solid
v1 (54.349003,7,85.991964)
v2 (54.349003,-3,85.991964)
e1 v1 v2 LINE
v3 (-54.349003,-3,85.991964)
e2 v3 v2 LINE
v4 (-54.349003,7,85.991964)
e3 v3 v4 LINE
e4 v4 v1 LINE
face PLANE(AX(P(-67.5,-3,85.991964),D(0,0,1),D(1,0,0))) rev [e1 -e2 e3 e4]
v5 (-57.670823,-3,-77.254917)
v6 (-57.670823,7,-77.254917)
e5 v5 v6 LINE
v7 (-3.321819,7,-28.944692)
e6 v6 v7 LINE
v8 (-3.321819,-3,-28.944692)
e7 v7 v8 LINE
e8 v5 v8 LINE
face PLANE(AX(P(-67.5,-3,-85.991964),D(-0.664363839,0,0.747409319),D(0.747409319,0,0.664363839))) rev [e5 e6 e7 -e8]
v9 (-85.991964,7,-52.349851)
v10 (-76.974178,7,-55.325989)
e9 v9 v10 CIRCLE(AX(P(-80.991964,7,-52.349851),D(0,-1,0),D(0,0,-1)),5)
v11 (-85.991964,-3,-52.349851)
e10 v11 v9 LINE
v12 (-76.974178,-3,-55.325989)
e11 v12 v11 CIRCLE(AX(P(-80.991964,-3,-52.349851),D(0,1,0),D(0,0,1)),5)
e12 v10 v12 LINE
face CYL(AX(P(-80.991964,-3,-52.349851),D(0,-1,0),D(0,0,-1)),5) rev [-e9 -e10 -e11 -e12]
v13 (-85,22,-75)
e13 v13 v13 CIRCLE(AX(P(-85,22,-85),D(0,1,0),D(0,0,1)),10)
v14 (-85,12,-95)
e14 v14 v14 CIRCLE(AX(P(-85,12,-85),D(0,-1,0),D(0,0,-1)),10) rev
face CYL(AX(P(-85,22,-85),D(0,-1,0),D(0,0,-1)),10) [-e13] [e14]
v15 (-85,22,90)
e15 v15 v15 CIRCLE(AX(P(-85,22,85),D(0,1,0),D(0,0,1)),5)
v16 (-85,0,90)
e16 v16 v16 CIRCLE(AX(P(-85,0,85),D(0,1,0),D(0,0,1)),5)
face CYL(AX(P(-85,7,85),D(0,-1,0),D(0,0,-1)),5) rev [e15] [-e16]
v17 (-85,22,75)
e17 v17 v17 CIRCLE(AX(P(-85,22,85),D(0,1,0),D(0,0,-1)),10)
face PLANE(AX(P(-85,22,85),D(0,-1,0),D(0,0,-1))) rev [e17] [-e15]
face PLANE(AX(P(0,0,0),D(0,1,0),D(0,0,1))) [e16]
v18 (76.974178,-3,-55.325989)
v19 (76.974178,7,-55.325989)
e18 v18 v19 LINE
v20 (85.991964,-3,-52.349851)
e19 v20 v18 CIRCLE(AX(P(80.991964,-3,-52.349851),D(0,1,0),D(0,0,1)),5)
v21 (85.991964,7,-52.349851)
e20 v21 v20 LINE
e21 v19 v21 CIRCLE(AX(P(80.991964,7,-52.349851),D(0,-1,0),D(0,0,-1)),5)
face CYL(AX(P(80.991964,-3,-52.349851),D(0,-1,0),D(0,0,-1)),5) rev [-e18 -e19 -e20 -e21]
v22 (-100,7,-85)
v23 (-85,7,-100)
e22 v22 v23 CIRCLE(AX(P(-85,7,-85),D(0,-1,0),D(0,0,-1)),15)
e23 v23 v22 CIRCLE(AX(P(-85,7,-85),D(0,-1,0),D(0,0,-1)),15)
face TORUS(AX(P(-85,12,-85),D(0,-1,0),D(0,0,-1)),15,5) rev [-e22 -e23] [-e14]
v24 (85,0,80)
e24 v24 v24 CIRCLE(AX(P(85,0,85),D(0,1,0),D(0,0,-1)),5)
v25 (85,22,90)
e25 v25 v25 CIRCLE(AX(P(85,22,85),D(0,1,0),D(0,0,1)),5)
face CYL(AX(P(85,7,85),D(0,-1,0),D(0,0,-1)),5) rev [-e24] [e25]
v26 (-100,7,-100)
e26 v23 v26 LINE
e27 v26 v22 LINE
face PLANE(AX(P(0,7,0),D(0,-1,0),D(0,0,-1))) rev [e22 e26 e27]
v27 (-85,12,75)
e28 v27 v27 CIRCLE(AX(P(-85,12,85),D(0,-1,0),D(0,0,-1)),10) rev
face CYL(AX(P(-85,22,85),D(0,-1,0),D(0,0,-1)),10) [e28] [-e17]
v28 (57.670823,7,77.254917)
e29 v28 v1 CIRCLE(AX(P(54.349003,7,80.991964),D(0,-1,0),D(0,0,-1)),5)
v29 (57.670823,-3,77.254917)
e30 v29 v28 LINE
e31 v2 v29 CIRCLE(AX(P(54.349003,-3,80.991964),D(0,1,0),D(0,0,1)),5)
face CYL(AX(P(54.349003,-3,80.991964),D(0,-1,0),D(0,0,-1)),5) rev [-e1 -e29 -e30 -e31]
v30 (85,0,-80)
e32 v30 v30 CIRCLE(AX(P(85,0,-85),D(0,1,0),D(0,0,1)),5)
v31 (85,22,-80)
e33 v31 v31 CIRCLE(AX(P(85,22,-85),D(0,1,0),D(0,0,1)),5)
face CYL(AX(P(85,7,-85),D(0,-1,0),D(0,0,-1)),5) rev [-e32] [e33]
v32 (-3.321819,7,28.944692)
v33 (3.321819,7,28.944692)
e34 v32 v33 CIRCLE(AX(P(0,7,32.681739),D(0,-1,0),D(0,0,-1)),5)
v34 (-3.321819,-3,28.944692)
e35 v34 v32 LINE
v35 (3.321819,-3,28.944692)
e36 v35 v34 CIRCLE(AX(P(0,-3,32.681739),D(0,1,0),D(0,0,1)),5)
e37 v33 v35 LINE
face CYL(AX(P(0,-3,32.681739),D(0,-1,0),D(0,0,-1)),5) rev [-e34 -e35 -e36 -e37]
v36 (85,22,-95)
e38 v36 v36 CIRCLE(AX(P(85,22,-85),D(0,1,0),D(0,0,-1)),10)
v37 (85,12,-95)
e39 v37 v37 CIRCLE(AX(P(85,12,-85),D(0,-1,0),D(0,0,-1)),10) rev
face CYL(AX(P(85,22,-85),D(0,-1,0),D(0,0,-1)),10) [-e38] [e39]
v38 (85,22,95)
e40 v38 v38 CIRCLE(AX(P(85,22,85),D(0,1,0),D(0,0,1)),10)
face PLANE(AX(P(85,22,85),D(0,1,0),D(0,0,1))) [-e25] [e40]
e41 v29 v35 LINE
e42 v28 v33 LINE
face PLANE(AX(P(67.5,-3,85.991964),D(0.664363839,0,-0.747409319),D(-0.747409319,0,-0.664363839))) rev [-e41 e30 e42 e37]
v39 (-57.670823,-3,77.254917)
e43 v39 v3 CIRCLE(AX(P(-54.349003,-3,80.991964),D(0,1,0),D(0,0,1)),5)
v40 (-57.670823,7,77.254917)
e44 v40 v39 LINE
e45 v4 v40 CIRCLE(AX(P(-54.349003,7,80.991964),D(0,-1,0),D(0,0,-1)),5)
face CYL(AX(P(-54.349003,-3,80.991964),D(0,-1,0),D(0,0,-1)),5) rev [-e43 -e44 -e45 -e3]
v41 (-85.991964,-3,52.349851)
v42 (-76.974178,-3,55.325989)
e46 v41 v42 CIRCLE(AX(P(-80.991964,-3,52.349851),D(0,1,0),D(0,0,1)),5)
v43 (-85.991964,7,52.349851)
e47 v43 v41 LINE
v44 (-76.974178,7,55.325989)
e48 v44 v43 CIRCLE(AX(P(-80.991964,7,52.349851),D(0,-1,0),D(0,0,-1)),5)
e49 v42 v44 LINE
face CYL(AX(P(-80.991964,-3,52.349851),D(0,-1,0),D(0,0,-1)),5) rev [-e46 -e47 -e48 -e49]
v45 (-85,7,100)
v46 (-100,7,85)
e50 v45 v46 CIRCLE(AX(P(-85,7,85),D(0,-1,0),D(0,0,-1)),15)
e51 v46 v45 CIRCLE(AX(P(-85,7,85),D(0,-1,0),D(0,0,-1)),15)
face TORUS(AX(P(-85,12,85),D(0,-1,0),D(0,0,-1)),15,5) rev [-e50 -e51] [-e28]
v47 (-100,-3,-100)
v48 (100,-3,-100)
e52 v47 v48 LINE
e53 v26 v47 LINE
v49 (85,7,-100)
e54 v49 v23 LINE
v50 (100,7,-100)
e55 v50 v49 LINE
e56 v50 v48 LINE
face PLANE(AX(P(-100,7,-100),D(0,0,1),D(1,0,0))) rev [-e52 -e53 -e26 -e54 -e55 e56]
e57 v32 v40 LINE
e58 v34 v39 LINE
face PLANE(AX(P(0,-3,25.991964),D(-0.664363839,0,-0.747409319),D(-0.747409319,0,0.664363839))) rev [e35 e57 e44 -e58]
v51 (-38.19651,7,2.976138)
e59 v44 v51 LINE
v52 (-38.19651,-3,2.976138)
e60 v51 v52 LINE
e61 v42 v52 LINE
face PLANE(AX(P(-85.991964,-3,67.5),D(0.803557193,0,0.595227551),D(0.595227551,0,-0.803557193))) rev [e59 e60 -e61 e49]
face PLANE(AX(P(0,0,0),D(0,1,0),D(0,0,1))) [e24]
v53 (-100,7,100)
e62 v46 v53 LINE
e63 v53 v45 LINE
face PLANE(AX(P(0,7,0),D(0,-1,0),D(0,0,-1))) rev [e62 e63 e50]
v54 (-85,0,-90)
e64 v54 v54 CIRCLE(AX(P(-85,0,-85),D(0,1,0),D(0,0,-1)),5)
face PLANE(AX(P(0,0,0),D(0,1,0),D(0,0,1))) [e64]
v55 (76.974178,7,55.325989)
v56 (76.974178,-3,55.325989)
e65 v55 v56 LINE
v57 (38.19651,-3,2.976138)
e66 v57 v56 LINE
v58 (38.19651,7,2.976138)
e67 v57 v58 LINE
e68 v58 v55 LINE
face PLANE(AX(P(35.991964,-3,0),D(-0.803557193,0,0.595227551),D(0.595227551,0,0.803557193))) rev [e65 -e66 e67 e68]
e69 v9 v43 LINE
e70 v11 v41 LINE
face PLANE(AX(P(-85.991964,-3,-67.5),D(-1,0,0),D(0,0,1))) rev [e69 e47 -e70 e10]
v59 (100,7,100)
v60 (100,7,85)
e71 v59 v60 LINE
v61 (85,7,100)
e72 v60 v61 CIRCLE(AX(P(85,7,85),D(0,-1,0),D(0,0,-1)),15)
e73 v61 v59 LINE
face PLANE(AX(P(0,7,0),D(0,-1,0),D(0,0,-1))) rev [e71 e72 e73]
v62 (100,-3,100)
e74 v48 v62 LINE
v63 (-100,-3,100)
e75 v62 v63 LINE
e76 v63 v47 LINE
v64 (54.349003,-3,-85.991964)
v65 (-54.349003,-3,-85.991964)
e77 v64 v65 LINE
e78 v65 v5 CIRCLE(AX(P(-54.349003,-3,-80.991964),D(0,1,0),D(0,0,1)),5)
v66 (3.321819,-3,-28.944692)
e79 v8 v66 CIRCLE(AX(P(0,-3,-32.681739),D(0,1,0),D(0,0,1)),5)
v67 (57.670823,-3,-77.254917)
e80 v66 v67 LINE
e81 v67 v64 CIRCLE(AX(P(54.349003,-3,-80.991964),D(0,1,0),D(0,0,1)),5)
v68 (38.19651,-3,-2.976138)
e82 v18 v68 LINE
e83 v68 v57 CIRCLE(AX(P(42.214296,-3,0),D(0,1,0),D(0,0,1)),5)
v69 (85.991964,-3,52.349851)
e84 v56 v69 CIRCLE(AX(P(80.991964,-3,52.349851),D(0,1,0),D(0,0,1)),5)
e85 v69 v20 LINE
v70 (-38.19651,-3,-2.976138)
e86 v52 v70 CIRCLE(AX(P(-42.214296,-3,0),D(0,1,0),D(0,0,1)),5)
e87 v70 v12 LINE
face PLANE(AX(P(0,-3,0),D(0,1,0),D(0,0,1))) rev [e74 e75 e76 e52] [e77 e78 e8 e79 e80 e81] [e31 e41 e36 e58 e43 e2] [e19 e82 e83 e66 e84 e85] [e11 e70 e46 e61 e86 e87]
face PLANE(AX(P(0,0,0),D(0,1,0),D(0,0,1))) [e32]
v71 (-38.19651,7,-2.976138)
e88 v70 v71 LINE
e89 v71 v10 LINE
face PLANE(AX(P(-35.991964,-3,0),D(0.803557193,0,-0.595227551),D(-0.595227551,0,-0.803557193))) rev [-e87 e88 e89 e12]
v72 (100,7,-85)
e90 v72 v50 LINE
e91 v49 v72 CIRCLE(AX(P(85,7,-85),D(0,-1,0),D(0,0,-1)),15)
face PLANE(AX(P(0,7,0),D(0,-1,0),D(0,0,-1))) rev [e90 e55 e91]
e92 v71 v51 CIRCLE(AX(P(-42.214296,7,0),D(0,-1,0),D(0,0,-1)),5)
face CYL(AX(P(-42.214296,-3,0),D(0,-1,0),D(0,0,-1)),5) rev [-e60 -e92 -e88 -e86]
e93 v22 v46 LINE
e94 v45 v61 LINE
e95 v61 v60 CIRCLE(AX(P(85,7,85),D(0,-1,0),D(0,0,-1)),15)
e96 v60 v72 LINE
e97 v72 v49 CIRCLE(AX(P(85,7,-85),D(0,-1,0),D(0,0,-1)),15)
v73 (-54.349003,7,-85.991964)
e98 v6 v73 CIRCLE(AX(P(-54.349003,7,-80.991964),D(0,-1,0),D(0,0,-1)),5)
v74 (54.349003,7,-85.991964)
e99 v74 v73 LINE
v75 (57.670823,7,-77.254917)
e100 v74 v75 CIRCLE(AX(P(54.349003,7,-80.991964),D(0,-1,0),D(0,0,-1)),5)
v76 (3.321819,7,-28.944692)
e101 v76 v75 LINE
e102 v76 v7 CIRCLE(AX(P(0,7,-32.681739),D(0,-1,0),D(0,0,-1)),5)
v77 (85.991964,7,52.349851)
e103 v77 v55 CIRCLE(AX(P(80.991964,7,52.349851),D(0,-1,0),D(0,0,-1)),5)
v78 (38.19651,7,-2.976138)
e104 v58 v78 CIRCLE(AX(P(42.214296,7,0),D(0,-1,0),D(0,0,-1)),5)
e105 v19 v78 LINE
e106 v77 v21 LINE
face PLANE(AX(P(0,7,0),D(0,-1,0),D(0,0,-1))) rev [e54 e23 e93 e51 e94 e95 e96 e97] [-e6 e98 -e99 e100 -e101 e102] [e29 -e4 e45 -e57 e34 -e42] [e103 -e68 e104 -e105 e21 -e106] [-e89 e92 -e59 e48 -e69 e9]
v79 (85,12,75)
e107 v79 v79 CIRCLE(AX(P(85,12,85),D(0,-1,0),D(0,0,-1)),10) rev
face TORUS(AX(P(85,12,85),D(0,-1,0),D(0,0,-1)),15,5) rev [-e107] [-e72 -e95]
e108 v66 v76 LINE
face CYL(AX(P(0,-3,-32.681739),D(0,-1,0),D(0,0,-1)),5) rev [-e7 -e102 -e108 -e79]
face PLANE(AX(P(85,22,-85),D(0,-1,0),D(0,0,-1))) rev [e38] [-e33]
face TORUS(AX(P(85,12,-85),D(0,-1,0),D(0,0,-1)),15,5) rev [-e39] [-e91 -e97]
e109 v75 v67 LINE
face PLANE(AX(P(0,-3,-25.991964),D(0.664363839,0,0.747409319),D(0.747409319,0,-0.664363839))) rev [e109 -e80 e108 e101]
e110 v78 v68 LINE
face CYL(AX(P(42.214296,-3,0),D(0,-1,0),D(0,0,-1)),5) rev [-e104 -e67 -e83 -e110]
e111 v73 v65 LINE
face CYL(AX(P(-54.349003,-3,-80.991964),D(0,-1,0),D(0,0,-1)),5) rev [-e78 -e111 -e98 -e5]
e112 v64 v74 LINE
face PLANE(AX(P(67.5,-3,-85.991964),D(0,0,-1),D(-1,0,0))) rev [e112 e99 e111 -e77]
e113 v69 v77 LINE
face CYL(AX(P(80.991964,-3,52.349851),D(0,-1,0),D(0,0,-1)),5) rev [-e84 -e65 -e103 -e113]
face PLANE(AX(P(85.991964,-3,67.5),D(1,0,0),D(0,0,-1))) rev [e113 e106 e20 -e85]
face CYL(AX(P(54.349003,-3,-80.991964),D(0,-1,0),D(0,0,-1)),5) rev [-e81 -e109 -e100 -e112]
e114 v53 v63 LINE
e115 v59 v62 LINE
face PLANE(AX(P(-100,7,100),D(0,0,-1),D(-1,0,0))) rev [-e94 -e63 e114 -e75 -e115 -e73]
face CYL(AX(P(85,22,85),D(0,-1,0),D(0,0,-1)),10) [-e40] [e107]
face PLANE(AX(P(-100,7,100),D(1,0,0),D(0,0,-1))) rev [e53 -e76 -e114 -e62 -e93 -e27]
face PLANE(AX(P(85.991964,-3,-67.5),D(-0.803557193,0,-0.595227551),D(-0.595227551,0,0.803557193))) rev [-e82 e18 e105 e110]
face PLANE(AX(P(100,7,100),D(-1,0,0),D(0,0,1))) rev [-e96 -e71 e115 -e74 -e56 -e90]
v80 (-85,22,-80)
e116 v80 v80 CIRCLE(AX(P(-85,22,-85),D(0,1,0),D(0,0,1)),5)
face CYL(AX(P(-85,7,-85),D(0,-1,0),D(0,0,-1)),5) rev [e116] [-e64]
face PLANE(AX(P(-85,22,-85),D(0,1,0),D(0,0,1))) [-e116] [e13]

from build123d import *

# Parameters (mm, degrees)
SKETCH_1_W          = 200
SKETCH_1_H          = 200
SKETCH_1_R          = 5
EXTRUDE_1_DEPTH     = 7
SKETCH_2_R          = 10
SKETCH_2_R_2        = 5
EXTRUDE_2_DEPTH     = 15
SKETCH_3_W          = 200
SKETCH_3_H          = 200
EXTRUDE_3_DEPTH     = 3
CUT_EXTRUDE_2_DEPTH = 143.214626533
FILLET_2_R          = 5


with BuildPart() as part:
    # 草圖1 → 填料-伸長1 (new body)
    with BuildSketch(Plane(origin=(0, 0, 0), x_dir=(1, 0, 0), z_dir=(0, 1, 0))):
        Rectangle(SKETCH_1_W, SKETCH_1_H)
        with Locations(Location((85, 85, 0), (0, 0, 270))):
            Circle(SKETCH_1_R, mode=Mode.SUBTRACT)
        with Locations(Location((-85, 85, 0), (0, 0, 90))):
            Circle(SKETCH_1_R, mode=Mode.SUBTRACT)
        with Locations(Location((85, -85, 0), (0, 0, 90))):
            Circle(SKETCH_1_R, mode=Mode.SUBTRACT)
        with Locations(Location((-85, -85, 0), (0, 0, 270))):
            Circle(SKETCH_1_R, mode=Mode.SUBTRACT)
    extrude(amount=EXTRUDE_1_DEPTH)

    # 草圖2 → 填料-伸長2 (add)
    # profile 1 of 4: a face of its own
    with BuildSketch(Plane(origin=(0, 7, 0), x_dir=(1, 0, 0), z_dir=(0, 1, 0))):
        with Locations(Location((-85, 85, 0), (0, 0, 90))):
            Circle(SKETCH_2_R)
        with Locations(Location((-85, 85, 0), (0, 0, 90))):
            Circle(SKETCH_2_R_2, mode=Mode.SUBTRACT)
    # profile 2 of 4: a face of its own
    with BuildSketch(Plane(origin=(0, 7, 0), x_dir=(1, 0, 0), z_dir=(0, 1, 0))):
        with Locations(Location((85, 85, 0), (0, 0, 90))):
            Circle(SKETCH_2_R)
        with Locations(Location((85, 85, 0), (0, 0, 270))):
            Circle(SKETCH_2_R_2, mode=Mode.SUBTRACT)
    # profile 3 of 4: a face of its own
    with BuildSketch(Plane(origin=(0, 7, 0), x_dir=(1, 0, 0), z_dir=(0, 1, 0))):
        with Locations(Location((85, -85, 0), (0, 0, 90))):
            Circle(SKETCH_2_R)
        with Locations(Location((85, -85, 0), (0, 0, 90))):
            Circle(SKETCH_2_R_2, mode=Mode.SUBTRACT)
    # profile 4 of 4: a face of its own
    with BuildSketch(Plane(origin=(0, 7, 0), x_dir=(1, 0, 0), z_dir=(0, 1, 0))):
        with Locations(Location((-85, -85, 0), (0, 0, 90))):
            Circle(SKETCH_2_R)
        with Locations(Location((-85, -85, 0), (0, 0, 270))):
            Circle(SKETCH_2_R_2, mode=Mode.SUBTRACT)
    extrude(amount=EXTRUDE_2_DEPTH)

    # 草圖3 → 填料-伸長3 (add)
    with BuildSketch(Plane.XZ):
        Rectangle(SKETCH_3_W, SKETCH_3_H)
    extrude(amount=EXTRUDE_3_DEPTH)

    # 草圖6 → 除料-伸長2 (cut, through all)
    with BuildSketch(Plane(origin=(0, 7, 0), x_dir=(1, 0, 0), z_dir=(0, 1, 0))):
        Polygon((-67.5, 85.991963893), (0, 25.991963893), (67.5, 85.991963893), align=None)
        Polygon((85.991963893, -67.5), (85.991963893, 67.5), (35.991963893, 0), align=None)
        Polygon((-67.5, -85.991963893), (67.5, -85.991963893), (0, -25.991963893), align=None)
        Polygon((-85.991963893, 67.5), (-85.991963893, -67.5), (-35.991963893, 0), align=None)
    extrude(amount=-CUT_EXTRUDE_2_DEPTH, mode=Mode.SUBTRACT)

    # 圓角2
    fillet_2_edges = [part.edges().sort_by_distance(p)[0] for p in [
        (-67.5, 2, -85.991963893),
        (67.5, 2, -85.991963893),
        (0, 2, -25.991963893),
        (-85, 7, -75),
        (85, 7, -75),
        (85, 7, 95),
        (-85, 7, 95),
        (0, 2, 25.991963893),
        (67.5, 2, 85.991963893),
        (-67.5, 2, 85.991963893),
        (35.991963893, 2, 0),
        (85.991963893, 2, -67.5),
        (85.991963893, 2, 67.5),
        (-35.991963893, 2, 0),
        (-85.991963893, 2, 67.5),
        (-85.991963893, 2, -67.5),
    ]]
    fillet(fillet_2_edges, radius=FILLET_2_R - 0.0001)  # a hair under: the kernel refuses the full size


solid = part.part
